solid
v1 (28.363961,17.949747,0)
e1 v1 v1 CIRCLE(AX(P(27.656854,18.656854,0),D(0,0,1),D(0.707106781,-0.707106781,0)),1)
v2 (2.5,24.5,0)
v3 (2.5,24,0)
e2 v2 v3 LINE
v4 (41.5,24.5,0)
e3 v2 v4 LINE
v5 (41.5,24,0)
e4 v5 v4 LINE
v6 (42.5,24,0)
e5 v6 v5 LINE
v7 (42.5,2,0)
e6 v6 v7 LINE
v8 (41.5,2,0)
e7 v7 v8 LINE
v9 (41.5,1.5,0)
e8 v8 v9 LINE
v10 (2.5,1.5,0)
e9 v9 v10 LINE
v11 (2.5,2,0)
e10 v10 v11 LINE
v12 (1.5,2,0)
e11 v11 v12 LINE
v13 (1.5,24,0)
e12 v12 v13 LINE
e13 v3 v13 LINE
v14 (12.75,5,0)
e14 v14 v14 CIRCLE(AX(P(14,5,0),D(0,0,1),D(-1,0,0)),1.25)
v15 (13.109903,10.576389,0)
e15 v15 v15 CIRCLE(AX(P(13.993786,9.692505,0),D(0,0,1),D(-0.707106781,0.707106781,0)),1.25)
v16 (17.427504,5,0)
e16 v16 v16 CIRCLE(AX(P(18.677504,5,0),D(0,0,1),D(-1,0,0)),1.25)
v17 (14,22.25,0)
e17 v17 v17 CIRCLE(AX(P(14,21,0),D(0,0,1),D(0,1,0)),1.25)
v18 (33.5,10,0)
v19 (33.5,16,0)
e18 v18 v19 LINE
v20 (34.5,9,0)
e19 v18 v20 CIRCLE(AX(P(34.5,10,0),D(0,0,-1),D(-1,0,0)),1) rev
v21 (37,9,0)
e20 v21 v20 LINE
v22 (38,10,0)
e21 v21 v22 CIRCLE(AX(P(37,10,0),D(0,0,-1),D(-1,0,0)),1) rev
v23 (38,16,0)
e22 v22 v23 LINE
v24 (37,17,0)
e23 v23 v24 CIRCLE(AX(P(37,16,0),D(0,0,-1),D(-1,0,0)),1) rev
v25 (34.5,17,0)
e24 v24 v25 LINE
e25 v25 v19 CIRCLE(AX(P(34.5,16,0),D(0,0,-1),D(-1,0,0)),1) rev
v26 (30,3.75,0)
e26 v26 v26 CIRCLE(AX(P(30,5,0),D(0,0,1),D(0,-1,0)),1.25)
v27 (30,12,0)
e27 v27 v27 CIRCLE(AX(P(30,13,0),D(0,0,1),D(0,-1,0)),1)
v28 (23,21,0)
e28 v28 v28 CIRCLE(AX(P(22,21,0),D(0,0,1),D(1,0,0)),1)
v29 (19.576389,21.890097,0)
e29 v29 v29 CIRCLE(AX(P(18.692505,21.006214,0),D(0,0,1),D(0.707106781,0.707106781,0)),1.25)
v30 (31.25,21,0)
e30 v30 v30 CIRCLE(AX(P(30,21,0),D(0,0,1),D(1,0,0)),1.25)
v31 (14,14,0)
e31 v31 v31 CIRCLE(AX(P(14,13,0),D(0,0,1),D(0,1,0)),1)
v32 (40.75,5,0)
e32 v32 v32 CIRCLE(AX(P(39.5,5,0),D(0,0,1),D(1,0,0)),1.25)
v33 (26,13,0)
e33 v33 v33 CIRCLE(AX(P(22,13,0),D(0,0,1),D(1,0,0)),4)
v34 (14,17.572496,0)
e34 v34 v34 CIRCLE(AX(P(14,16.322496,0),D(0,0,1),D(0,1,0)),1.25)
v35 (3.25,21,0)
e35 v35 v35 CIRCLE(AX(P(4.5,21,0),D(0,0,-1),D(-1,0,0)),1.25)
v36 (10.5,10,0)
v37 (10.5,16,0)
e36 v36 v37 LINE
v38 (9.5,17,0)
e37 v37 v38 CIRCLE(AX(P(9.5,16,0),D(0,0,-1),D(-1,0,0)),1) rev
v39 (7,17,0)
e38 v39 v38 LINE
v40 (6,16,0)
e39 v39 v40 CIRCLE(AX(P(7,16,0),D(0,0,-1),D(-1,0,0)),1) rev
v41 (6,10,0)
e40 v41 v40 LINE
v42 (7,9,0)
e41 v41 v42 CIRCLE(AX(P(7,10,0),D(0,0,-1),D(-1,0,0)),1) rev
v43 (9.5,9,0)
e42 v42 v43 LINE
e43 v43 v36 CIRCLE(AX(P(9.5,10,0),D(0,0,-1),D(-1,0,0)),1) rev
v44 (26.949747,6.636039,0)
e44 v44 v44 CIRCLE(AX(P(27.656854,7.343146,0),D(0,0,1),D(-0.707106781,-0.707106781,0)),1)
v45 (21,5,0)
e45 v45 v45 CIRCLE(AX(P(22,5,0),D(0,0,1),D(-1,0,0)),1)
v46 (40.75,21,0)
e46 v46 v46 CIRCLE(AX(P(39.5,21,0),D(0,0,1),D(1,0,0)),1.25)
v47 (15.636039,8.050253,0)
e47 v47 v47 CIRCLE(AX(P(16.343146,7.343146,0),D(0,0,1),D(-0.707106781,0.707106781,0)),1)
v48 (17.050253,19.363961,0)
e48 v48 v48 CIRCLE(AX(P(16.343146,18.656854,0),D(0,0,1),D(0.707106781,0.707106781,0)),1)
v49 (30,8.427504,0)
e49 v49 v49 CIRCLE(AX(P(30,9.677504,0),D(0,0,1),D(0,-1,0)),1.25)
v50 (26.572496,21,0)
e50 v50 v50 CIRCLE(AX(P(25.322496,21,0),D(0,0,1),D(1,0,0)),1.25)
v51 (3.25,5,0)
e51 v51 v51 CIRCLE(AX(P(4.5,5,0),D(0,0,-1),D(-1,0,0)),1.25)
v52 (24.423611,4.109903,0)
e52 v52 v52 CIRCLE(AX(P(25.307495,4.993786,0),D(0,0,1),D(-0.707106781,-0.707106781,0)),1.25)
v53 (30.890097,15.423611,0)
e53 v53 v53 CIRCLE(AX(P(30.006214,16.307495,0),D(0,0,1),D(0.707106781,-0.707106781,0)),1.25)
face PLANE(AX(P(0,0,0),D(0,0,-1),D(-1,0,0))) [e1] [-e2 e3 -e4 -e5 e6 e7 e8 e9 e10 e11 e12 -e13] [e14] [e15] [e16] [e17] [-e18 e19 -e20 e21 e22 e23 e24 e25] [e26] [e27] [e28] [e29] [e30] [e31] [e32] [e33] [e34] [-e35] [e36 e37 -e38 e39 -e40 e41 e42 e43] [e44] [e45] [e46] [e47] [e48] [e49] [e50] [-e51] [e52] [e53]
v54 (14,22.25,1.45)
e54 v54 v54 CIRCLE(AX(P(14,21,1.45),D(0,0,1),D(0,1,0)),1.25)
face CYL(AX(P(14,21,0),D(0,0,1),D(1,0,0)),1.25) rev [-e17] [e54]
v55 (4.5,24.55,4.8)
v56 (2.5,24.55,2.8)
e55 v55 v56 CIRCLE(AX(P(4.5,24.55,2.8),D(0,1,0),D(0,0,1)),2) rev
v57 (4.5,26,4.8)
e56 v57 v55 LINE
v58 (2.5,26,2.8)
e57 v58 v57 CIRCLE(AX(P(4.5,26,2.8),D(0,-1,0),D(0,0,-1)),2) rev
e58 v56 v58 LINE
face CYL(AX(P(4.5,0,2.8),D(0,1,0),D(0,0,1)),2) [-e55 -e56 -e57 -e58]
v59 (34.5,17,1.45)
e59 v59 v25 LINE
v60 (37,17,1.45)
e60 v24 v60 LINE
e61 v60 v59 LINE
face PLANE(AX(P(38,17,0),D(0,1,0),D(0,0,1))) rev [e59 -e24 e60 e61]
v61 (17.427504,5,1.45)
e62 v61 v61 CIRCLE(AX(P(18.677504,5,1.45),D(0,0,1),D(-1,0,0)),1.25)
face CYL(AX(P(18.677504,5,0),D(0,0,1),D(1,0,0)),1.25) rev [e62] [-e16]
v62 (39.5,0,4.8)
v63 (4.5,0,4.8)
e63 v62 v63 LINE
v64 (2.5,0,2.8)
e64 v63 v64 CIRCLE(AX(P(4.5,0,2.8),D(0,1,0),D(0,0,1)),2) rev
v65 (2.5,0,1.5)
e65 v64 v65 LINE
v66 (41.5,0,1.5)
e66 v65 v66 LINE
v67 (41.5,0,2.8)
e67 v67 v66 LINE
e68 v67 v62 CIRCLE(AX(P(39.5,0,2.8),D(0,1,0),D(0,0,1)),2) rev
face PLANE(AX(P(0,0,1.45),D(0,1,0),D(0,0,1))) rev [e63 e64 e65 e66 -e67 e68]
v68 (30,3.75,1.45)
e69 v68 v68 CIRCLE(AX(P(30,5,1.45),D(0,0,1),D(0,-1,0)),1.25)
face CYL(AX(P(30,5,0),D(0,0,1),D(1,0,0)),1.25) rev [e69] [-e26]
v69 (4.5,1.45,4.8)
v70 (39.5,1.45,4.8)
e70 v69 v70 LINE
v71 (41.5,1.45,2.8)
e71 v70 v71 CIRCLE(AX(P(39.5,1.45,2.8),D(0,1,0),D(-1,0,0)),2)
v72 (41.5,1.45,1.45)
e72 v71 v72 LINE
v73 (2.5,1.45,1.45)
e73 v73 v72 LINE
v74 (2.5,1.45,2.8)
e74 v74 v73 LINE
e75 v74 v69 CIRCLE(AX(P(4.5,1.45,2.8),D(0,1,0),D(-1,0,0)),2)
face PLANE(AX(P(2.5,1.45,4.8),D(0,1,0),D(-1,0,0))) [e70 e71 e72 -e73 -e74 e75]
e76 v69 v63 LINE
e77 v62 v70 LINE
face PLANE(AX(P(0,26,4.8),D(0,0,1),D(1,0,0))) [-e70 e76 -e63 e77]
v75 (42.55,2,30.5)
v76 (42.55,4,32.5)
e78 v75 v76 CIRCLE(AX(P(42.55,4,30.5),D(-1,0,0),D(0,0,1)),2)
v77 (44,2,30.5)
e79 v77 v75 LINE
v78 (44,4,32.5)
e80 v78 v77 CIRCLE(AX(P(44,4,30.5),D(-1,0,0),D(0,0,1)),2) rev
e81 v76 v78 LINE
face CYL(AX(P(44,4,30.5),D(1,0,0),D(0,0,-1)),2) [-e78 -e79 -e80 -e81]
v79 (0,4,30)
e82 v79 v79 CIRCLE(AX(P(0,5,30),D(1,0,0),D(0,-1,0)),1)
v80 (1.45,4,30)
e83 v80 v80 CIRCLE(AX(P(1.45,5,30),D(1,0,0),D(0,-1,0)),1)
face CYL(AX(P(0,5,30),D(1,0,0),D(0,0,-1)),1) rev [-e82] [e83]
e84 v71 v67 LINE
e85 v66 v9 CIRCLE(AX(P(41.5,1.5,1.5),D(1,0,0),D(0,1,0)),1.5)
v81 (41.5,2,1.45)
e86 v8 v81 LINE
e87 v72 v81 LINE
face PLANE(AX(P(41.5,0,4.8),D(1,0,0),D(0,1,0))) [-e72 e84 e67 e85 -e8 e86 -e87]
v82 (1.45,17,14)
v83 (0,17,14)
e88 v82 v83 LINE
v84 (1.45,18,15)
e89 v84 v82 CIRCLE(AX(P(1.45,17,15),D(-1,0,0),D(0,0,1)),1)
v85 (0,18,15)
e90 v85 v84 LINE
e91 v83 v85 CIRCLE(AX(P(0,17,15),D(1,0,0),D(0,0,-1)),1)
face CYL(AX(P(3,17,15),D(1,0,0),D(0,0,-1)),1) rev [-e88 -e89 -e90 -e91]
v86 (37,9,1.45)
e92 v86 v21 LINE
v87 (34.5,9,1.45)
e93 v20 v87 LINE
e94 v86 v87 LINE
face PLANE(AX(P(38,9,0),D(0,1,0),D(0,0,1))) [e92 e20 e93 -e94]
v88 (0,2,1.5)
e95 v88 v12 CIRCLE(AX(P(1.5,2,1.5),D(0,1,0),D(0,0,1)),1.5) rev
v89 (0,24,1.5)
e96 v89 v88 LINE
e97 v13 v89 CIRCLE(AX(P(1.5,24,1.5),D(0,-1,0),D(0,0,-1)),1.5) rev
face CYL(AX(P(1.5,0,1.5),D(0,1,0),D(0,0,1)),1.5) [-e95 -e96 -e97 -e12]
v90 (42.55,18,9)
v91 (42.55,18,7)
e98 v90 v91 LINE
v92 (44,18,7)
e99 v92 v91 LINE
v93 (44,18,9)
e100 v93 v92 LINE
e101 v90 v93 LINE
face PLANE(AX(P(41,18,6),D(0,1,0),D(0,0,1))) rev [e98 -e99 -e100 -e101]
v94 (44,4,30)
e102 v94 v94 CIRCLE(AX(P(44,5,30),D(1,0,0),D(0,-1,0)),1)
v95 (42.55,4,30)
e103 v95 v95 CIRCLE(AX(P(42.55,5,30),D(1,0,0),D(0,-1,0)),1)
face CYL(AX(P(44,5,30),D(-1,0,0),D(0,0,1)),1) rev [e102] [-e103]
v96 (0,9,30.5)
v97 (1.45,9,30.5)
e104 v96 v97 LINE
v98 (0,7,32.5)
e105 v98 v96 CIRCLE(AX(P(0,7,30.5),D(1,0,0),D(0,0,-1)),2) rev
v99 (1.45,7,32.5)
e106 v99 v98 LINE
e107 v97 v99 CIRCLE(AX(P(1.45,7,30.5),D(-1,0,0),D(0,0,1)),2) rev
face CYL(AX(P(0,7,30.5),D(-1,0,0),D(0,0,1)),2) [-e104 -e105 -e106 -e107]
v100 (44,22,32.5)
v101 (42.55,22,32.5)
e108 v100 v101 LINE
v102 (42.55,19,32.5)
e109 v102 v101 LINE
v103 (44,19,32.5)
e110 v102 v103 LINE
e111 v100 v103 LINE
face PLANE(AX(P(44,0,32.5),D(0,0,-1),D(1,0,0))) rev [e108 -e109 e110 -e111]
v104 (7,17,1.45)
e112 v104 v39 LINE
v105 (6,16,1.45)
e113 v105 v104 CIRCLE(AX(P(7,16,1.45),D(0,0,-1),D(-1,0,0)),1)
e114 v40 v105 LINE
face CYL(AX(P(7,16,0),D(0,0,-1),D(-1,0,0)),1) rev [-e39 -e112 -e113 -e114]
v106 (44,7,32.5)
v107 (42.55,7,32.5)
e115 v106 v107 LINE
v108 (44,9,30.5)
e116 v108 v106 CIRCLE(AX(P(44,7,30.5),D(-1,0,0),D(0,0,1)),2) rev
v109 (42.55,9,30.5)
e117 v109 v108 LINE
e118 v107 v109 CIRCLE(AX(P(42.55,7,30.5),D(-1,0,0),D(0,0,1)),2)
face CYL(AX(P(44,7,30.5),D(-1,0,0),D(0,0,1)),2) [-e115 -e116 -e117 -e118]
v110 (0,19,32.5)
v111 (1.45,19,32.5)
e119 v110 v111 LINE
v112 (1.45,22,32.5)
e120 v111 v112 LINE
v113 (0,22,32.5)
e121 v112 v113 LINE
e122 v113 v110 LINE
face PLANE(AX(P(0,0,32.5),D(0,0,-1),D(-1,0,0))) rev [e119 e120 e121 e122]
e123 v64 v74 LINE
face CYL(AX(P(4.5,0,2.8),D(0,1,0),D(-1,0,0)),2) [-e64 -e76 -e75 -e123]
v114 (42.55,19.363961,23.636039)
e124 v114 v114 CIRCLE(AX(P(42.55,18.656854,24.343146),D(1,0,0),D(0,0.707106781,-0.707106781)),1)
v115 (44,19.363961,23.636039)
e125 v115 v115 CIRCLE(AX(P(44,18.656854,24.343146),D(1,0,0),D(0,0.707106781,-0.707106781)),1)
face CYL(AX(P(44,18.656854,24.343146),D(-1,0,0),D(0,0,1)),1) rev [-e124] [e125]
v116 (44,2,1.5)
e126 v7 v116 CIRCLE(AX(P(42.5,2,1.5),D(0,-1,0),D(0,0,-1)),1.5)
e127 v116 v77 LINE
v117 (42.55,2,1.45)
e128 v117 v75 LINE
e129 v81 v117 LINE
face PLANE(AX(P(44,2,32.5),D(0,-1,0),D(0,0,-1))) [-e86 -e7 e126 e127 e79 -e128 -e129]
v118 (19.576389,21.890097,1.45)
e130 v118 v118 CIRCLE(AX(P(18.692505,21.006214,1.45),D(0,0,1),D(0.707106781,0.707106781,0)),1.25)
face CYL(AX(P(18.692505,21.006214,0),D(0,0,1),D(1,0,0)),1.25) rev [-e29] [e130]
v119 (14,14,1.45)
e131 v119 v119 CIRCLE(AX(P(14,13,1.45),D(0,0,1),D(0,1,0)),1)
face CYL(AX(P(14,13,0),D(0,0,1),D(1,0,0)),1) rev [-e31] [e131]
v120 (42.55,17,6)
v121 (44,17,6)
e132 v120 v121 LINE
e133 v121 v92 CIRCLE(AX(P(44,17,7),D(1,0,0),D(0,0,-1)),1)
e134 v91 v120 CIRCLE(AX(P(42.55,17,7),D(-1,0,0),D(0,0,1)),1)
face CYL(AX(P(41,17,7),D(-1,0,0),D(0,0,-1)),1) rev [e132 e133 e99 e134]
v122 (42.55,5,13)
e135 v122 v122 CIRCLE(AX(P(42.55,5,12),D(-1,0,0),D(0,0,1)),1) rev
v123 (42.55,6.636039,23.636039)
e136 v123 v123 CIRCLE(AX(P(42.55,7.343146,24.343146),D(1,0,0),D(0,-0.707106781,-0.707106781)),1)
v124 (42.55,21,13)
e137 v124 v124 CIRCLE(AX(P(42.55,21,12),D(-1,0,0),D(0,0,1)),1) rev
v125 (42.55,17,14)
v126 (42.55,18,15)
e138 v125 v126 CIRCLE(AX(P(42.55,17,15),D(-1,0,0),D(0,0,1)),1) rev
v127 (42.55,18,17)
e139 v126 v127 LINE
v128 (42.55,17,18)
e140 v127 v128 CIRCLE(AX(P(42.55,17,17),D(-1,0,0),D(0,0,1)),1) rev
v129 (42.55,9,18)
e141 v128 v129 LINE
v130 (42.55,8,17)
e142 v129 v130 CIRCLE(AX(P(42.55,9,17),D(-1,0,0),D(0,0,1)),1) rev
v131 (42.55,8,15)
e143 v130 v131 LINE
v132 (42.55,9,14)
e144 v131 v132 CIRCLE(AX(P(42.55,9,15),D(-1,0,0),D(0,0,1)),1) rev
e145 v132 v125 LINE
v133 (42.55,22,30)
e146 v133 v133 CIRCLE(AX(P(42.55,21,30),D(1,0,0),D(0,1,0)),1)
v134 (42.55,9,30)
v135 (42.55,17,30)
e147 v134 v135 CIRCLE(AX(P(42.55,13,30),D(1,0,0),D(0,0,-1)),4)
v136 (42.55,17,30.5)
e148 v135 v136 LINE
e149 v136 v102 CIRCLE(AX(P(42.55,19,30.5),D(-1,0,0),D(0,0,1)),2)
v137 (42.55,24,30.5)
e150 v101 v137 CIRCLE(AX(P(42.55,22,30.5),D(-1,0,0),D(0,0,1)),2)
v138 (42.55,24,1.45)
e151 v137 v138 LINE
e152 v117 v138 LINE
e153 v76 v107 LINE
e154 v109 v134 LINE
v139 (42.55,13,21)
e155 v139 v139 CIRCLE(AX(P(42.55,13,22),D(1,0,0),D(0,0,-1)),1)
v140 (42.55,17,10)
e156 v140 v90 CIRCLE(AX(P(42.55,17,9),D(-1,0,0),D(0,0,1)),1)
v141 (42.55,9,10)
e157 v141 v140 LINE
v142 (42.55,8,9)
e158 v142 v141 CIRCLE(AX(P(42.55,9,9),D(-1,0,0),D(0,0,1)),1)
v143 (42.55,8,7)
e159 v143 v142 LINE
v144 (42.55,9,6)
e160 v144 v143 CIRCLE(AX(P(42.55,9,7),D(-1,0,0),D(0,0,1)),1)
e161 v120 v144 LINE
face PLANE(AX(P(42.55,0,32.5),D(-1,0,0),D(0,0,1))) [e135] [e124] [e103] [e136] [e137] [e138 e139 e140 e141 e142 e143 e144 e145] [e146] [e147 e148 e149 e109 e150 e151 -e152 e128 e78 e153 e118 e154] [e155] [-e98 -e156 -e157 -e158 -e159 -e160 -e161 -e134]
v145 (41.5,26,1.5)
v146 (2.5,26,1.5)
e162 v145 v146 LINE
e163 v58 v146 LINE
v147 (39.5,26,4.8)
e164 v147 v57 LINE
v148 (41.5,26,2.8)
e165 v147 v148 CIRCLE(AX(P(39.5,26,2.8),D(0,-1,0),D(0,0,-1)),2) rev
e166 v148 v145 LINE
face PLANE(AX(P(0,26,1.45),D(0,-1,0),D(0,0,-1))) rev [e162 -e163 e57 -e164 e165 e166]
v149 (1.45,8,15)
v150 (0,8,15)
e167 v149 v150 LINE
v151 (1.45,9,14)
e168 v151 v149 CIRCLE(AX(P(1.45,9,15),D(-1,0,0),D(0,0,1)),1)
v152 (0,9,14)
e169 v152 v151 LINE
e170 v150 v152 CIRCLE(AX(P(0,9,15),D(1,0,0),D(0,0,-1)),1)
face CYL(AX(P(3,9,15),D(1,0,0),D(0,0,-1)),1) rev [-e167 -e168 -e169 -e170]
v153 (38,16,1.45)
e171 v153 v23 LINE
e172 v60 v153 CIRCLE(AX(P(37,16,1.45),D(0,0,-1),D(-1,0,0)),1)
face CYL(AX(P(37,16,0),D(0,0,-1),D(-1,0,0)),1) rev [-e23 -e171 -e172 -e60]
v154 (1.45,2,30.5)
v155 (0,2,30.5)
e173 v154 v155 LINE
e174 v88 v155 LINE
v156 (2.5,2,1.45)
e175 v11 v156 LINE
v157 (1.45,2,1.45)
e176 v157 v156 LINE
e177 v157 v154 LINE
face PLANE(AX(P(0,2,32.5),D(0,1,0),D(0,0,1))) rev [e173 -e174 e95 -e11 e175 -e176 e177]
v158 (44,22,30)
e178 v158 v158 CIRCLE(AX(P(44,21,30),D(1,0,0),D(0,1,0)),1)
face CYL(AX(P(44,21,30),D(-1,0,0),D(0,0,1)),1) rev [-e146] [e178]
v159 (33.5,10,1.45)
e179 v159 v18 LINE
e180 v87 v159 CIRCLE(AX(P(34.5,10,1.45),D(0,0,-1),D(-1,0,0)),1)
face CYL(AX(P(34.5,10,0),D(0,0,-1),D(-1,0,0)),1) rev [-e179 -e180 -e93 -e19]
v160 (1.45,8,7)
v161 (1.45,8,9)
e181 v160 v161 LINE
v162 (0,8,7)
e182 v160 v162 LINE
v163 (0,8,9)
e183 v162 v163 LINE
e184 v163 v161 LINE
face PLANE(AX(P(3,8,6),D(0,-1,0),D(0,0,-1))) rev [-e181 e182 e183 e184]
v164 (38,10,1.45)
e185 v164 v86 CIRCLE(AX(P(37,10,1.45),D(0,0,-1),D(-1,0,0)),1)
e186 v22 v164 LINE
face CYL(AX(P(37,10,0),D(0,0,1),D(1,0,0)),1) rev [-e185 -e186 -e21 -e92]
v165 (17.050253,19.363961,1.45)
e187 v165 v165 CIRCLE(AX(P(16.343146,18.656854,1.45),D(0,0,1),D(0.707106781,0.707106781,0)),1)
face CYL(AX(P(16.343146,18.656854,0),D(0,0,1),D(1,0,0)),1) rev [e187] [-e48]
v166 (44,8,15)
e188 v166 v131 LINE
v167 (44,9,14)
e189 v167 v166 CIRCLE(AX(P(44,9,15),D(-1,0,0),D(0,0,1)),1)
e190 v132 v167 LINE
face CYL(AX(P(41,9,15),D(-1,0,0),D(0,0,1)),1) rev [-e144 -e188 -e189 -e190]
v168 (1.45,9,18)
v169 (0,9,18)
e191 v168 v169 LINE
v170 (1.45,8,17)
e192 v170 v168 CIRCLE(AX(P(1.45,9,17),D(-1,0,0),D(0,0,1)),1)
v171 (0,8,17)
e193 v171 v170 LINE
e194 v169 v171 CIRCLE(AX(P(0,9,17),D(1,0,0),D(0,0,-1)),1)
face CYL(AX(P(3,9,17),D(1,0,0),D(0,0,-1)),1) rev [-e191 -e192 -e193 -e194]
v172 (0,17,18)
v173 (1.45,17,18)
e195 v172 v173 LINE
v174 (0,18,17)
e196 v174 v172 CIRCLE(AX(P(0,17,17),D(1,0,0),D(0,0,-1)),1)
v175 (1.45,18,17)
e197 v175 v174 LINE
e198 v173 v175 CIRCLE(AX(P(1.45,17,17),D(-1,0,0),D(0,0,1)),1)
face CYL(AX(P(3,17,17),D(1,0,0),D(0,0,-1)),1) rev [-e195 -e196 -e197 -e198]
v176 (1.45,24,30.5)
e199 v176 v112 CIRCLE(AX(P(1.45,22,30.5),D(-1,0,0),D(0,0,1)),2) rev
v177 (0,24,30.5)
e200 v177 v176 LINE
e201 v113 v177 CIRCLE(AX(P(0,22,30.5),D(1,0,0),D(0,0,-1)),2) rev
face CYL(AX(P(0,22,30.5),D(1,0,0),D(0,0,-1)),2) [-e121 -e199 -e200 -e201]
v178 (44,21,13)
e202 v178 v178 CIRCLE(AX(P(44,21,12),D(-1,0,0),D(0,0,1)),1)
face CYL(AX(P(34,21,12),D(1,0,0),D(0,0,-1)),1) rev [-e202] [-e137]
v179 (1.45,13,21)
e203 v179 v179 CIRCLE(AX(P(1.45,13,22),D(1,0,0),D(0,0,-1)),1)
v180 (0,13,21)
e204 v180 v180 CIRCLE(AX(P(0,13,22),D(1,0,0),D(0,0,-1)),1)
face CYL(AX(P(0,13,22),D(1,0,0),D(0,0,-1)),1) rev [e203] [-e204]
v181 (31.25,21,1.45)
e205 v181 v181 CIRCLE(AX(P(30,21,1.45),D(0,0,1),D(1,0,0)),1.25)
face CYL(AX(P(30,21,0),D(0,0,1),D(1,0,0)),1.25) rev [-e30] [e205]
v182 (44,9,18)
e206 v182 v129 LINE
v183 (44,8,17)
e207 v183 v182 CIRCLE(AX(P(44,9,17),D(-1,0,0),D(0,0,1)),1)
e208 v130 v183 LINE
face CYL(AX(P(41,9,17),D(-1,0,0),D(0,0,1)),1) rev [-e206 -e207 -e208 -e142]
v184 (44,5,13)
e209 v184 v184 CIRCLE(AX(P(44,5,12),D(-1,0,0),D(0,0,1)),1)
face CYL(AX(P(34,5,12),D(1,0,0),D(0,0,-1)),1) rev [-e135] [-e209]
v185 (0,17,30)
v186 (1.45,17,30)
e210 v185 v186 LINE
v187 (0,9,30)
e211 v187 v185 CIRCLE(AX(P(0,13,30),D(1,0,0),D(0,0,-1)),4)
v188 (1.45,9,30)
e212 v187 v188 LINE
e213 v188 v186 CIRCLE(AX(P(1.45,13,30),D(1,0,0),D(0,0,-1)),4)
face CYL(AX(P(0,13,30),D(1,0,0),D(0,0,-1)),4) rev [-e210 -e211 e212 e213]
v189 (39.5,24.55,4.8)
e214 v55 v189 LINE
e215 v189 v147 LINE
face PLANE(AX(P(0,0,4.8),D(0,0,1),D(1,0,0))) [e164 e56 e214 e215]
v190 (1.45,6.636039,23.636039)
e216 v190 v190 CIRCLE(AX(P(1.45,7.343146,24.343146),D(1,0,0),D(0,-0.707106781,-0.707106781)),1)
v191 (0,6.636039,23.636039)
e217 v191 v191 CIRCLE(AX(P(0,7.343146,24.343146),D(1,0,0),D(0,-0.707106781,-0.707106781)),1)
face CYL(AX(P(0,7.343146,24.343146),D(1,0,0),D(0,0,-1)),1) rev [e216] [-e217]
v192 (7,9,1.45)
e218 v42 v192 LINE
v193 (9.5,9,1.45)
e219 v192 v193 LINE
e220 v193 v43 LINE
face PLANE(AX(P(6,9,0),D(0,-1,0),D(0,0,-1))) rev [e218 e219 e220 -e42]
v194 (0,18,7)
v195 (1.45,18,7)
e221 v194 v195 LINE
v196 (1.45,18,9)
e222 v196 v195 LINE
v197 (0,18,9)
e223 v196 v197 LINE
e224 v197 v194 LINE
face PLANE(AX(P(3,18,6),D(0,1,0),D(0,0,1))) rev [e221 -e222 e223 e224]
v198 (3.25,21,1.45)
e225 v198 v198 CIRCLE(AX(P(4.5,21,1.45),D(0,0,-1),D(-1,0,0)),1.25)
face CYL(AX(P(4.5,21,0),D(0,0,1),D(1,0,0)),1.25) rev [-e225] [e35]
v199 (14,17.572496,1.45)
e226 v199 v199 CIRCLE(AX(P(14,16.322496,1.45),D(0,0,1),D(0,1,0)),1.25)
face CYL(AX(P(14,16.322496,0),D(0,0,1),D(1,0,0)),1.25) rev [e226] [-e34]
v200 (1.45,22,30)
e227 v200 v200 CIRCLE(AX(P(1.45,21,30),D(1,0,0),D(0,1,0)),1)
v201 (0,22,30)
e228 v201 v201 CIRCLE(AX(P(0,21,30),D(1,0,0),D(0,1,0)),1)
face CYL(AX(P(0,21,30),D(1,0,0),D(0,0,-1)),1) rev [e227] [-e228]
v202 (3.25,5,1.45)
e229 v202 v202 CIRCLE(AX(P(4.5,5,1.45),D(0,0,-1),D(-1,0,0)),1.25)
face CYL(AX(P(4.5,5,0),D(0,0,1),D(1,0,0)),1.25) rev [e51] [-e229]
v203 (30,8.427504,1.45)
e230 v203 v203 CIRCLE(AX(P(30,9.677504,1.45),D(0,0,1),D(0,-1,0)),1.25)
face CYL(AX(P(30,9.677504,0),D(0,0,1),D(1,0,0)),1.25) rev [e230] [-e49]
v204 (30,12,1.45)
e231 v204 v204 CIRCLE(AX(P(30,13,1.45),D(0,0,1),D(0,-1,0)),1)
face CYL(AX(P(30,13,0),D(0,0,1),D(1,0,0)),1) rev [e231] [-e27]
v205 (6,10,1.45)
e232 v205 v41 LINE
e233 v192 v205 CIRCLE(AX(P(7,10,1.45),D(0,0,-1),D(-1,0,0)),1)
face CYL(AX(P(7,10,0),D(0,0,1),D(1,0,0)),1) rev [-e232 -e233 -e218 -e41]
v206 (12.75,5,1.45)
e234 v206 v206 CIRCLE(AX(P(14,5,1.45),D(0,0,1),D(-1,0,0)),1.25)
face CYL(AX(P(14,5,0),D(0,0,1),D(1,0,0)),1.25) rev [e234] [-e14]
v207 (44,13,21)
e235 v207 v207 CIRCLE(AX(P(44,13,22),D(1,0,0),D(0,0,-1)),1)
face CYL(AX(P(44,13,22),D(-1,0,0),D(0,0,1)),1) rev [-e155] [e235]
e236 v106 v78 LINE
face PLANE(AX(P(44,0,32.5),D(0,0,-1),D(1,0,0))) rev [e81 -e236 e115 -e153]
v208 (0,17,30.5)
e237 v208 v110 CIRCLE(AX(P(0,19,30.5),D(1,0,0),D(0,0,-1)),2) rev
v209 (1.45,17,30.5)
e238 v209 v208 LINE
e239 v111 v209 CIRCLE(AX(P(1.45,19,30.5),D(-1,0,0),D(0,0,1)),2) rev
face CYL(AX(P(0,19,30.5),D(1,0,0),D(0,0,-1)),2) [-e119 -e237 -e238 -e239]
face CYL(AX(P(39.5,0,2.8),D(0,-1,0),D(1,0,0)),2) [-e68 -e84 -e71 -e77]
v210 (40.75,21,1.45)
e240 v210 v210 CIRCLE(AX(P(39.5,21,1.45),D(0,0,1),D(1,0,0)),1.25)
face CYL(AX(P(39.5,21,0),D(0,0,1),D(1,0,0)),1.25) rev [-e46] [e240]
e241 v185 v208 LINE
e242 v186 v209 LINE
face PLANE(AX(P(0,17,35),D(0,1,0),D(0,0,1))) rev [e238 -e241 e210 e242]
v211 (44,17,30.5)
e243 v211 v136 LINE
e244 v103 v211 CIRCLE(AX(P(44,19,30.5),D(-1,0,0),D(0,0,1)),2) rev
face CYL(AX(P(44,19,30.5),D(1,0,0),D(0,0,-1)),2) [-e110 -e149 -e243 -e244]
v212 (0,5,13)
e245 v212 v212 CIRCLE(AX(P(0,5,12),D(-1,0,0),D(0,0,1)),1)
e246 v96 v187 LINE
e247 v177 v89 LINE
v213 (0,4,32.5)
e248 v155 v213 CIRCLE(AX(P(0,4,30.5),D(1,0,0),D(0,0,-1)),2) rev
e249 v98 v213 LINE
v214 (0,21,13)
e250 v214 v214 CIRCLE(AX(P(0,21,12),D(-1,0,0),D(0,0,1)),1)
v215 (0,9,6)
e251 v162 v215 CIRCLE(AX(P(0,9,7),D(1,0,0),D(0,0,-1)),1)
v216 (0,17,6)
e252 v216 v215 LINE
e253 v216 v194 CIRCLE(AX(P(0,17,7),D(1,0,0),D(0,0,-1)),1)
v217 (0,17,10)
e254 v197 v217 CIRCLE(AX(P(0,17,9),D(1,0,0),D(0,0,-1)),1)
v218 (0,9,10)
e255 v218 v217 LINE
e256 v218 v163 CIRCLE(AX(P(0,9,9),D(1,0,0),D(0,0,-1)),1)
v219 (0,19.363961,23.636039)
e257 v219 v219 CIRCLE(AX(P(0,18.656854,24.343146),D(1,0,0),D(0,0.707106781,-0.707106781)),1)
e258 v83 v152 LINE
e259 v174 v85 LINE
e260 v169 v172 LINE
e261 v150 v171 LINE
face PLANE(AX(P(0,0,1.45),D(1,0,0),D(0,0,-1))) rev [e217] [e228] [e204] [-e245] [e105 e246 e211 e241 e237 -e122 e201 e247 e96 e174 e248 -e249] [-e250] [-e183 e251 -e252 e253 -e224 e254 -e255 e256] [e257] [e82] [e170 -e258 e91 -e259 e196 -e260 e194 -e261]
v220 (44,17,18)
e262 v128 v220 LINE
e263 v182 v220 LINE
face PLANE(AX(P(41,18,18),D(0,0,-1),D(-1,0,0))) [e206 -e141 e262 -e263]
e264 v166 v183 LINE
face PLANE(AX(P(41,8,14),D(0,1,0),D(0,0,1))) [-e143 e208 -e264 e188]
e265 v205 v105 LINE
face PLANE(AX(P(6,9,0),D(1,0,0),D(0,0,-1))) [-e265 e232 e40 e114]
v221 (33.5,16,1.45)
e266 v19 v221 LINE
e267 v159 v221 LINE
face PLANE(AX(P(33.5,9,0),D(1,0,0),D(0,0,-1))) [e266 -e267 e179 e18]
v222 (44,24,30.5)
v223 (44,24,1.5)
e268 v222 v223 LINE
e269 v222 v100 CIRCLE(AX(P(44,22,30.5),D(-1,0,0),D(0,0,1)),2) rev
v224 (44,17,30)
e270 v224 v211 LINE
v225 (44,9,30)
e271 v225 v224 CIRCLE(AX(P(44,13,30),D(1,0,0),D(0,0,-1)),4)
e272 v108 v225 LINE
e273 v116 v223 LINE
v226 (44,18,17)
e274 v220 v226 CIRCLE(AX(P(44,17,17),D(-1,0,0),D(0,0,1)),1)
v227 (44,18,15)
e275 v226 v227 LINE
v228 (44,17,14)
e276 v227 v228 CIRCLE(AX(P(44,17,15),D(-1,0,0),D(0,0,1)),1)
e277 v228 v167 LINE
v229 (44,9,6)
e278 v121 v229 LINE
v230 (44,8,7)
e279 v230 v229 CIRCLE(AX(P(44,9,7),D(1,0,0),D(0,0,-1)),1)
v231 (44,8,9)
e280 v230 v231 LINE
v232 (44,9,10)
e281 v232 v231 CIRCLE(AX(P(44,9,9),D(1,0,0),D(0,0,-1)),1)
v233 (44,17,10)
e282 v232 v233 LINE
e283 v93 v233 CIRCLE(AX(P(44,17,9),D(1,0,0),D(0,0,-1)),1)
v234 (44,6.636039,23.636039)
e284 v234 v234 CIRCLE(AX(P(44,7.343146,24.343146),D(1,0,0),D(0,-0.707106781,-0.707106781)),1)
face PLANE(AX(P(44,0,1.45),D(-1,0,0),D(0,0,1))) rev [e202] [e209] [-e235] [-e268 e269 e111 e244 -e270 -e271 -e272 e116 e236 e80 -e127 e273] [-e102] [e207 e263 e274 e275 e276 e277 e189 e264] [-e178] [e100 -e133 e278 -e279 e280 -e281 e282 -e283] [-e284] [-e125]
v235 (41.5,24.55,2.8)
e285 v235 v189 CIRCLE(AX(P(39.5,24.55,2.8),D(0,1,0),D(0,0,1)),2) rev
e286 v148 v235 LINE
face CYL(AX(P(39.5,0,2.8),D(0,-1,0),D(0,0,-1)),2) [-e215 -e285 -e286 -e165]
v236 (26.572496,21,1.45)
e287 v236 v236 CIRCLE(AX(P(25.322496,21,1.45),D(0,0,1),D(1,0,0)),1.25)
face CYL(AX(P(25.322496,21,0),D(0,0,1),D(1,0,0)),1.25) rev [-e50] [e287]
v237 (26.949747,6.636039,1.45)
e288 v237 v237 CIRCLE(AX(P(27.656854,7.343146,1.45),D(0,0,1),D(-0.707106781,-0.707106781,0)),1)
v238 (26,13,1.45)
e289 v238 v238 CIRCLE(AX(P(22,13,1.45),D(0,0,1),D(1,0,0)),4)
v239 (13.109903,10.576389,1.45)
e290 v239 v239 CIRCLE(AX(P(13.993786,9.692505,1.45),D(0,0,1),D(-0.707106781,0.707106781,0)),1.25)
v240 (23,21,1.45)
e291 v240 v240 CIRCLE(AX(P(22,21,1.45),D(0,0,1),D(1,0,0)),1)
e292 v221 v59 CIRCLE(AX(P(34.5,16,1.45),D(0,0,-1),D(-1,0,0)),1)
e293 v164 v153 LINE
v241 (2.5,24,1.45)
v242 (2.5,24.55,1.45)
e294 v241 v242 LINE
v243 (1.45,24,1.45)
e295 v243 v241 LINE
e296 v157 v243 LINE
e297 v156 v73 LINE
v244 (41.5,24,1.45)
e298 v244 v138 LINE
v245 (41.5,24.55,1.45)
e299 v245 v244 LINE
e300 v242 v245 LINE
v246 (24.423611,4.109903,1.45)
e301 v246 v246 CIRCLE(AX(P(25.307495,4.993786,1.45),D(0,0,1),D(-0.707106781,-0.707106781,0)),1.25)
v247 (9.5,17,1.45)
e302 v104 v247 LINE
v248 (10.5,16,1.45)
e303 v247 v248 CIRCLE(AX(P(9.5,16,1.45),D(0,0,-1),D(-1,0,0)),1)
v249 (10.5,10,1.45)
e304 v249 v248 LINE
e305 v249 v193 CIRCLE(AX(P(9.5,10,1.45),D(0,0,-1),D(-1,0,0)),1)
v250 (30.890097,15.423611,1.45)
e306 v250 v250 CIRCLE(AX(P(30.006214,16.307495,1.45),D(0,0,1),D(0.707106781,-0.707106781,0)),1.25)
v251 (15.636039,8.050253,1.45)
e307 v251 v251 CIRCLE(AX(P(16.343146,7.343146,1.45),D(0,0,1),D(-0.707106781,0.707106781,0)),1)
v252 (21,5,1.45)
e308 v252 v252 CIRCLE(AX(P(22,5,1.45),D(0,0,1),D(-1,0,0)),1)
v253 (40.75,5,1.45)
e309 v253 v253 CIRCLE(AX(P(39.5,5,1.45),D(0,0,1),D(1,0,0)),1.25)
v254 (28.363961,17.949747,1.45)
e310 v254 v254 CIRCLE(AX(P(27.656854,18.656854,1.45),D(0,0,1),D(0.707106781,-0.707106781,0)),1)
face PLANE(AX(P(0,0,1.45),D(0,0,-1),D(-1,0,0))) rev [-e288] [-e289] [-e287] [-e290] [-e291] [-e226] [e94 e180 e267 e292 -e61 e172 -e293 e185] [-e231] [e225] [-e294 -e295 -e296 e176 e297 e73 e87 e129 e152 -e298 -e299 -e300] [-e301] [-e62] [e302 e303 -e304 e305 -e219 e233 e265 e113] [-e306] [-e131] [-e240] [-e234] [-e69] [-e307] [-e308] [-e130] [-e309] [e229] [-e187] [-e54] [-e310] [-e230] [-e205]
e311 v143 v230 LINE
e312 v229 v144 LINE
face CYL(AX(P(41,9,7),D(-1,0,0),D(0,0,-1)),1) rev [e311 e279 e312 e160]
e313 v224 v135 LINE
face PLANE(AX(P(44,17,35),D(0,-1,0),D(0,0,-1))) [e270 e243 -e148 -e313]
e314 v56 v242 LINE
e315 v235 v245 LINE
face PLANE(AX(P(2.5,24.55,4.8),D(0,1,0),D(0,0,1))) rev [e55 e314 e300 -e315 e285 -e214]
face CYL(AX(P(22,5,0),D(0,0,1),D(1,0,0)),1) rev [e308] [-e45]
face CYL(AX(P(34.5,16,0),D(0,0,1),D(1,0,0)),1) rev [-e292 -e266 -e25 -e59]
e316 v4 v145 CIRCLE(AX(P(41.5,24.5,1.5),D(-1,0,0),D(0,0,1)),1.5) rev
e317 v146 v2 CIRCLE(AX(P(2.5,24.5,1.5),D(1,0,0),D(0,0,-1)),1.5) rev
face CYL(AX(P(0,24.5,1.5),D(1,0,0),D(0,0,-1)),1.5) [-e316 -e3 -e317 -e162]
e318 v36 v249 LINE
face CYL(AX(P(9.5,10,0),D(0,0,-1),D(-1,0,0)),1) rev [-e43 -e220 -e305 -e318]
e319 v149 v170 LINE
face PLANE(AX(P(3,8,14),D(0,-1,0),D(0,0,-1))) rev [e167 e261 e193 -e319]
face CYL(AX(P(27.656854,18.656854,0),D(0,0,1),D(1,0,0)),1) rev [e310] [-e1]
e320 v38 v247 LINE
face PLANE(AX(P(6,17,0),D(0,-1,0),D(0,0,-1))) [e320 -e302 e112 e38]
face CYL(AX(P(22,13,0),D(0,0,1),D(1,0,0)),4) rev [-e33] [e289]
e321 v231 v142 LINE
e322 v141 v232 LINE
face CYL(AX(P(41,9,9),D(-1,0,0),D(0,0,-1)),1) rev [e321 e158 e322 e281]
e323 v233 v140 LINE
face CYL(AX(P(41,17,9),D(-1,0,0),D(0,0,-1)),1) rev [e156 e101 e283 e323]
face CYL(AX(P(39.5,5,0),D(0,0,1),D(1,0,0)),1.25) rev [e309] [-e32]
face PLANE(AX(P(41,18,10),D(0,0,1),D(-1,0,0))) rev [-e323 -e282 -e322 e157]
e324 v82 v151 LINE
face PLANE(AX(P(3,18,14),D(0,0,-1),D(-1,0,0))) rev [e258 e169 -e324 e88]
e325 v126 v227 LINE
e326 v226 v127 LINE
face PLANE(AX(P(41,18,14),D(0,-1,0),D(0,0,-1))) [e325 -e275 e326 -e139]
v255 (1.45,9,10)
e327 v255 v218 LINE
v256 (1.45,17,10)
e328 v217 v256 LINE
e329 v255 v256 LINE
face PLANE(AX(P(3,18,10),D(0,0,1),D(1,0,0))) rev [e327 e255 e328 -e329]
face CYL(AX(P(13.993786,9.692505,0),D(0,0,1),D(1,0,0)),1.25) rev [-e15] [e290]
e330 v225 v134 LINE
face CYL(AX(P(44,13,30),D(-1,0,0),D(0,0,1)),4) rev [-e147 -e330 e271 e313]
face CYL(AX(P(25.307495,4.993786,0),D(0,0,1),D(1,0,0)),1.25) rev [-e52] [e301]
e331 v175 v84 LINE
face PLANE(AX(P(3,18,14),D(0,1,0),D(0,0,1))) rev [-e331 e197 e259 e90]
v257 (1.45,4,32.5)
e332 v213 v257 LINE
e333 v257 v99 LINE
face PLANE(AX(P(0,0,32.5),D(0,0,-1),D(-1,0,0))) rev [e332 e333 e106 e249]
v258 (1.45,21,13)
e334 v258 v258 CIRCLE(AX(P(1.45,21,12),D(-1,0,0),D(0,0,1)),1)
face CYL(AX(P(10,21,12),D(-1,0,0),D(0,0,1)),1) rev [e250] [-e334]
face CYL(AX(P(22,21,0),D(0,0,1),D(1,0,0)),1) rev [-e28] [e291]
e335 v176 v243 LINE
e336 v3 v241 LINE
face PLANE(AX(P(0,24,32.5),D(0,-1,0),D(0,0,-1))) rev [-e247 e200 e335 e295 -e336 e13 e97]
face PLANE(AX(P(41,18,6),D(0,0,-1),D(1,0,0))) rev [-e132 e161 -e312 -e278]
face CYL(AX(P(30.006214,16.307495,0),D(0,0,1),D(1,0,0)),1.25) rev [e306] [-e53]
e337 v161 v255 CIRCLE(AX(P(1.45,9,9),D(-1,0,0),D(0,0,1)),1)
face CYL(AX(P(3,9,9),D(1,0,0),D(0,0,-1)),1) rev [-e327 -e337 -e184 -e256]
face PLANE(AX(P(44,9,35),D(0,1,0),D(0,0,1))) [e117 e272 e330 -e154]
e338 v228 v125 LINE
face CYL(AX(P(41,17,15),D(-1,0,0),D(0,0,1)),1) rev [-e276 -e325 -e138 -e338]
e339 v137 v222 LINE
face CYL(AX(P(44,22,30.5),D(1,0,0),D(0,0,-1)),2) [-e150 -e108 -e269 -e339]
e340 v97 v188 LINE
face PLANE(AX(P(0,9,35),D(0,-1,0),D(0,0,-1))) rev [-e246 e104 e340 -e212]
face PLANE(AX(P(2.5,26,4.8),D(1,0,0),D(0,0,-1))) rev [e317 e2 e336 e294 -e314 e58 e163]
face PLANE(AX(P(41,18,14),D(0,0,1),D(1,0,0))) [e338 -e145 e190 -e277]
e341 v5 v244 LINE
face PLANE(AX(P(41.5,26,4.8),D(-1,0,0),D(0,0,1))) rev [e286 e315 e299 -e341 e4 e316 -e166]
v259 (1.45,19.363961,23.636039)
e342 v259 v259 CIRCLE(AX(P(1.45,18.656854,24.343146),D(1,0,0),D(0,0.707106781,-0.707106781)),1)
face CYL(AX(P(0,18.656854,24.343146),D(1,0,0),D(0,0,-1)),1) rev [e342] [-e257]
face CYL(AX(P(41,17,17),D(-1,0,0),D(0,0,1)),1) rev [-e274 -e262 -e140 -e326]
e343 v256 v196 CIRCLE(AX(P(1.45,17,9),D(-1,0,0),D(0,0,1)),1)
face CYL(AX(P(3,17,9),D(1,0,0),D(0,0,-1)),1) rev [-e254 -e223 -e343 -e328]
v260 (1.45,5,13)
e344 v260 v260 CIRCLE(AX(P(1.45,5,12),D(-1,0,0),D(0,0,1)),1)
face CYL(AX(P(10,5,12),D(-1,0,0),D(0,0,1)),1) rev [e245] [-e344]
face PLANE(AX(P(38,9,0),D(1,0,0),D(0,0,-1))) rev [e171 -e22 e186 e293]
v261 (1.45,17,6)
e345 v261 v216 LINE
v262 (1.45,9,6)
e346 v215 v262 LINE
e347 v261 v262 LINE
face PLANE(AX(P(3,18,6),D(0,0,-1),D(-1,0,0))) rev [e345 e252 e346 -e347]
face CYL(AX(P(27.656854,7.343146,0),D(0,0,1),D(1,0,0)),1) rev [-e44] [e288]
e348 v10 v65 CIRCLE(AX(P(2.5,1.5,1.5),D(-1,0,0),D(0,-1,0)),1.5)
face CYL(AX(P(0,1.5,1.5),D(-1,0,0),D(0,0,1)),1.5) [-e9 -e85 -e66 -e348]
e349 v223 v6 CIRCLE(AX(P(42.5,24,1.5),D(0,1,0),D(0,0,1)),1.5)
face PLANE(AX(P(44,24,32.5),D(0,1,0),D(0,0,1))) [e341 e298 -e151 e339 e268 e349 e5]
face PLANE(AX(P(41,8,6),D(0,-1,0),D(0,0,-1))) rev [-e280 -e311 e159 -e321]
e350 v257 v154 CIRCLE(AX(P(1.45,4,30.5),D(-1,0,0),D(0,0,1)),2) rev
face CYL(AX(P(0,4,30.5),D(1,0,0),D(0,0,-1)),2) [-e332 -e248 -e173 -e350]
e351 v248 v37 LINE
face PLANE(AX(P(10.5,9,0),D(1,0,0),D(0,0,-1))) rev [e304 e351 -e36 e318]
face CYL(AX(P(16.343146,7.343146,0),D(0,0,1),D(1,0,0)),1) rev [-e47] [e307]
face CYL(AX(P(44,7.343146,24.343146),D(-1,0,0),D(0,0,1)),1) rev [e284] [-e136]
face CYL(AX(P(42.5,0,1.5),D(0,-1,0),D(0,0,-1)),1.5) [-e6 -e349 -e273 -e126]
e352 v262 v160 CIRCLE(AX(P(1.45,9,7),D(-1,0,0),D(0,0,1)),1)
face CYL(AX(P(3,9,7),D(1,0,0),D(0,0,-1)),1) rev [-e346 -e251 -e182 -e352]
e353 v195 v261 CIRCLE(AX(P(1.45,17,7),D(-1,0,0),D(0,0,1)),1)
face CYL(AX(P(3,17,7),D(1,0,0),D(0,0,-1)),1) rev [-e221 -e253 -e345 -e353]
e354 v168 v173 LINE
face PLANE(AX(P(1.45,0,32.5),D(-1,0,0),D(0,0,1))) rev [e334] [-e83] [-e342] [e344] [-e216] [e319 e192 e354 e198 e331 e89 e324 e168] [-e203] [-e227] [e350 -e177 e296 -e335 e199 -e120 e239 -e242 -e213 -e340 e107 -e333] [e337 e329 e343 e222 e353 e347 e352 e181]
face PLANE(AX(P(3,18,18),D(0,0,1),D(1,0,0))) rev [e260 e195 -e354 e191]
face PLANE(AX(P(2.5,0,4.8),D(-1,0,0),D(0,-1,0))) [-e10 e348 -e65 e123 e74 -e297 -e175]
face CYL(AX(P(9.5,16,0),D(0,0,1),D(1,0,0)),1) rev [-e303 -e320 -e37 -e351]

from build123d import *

# Parameters (mm, degrees)
SKETCH1_W              = 44
SKETCH1_H              = 26
BOSS_EXTRUDE1_DEPTH    = 1.45
SKETCH3_R              = 4
CUT_EXTRUDE1_DEPTH     = 52.128294515
SKETCH4_R              = 1
CUT_EXTRUDE2_DEPTH     = 52.128294515
CIRPATTERN1_COUNT      = 8
SKETCH7_R              = 1.25
CUT_EXTRUDE3_DEPTH     = 52.128294515
CIRPATTERN2_COUNT      = 8
SKETCH9_R              = 1.25
CUT_EXTRUDE4_DEPTH     = 52.128294515
CIRPATTERN3_COUNT      = 4
SKETCH10_R             = 1.25
CUT_EXTRUDE5_DEPTH     = 52.128294515
SKETCH11_R             = 1.25
CUT_EXTRUDE6_DEPTH     = 52.128294515
SKETCH14_W             = 4.5
SKETCH14_H             = 8
CUT_EXTRUDE7_DEPTH     = 52.128294515
FILLET1_R              = 1
FILLET1_OF_MIRROR2_R   = 1
SKETCH16_W             = 1.45
SKETCH16_H             = 26
BOSS_EXTRUDE4_DEPTH    = 31.05
SKETCH21_W             = 5
SKETCH21_H             = 8
CUT_EXTRUDE10_DEPTH    = 60.521025697
SKETCH22_R             = 4
CUT_EXTRUDE11_DEPTH    = 60.521025697
SKETCH23_R             = 1
CUT_EXTRUDE12_DEPTH    = 60.521025697
CIRPATTERN5_COUNT      = 8
SKETCH24_W             = 31.05
SKETCH24_H             = 2
CUT_EXTRUDE13_DEPTH    = 60.521025697
SKETCH26_W             = 31.05
SKETCH26_H             = 2
CUT_EXTRUDE14_DEPTH    = 60.521025697
FILLET3_R              = 2
SKETCH28_R             = 1
CUT_EXTRUDE16_DEPTH    = 10
SKETCH30_R             = 1
CUT_EXTRUDE17_DEPTH    = 10
SKETCH31_W             = 4
SKETCH31_H             = 10
CUT_EXTRUDE18_DEPTH    = 3
FILLET4_R              = 1
LPATTERN1_COUNT        = 2
LPATTERN1_PITCH        = 8
FILLET4_OF_LPATTERN1_R = 1
MIRROR3_START          = 42.55
MIRROR3_OUTLINE_R      = 1
MIRROR3_DEPTH          = 1.45
SKETCH34_W             = 39
SKETCH34_H             = 1.45
BOSS_EXTRUDE8_DEPTH    = 3.35
SKETCH37_W             = 2.5
SKETCH37_H             = 2
CUT_EXTRUDE20_DEPTH    = 3.35
SKETCH35_W             = 2.5
SKETCH35_H             = 2
CUT_EXTRUDE21_DEPTH    = 3.35
FILLET5_R              = 1.5
FILLET6_R              = 2
FILLET7_R              = 1.5
FILLET8_R              = 1.5
FILLET9_R              = 2


# Read off the part's stored shape, not the designer's step: Mirror3
with BuildPart() as part:
    # Sketch1 → Boss-Extrude1 (new body)
    with BuildSketch(Plane.XY):
        with Locations((22, 13)):
            Rectangle(SKETCH1_W, SKETCH1_H)
    extrude(amount=BOSS_EXTRUDE1_DEPTH)

    # Sketch3 → Cut-Extrude1 (cut, through all)
    with BuildSketch(Plane.XY.offset(1.45)):
        with Locations((22, 13)):
            Circle(SKETCH3_R)
    extrude(amount=-CUT_EXTRUDE1_DEPTH, mode=Mode.SUBTRACT)

    # Sketch4 → Cut-Extrude2 (cut, through all)
    with BuildSketch(Plane.XY.offset(1.45)):
        with Locations((22, 21)):
            Circle(SKETCH4_R)
    cut_extrude2 = extrude(amount=-CUT_EXTRUDE2_DEPTH, mode=Mode.SUBTRACT)

    # CirPattern1: Cut-Extrude2 ×8 about axis
    cirpattern1_axis = Axis((22, 13, 0), (0, 0, 1))
    for i in range(1, CIRPATTERN1_COUNT):
        add(cut_extrude2.rotate(cirpattern1_axis, i * 360 / CIRPATTERN1_COUNT), mode=Mode.SUBTRACT)

    # Sketch7 → Cut-Extrude3 (cut, through all)
    with BuildSketch(Plane.XY.offset(1.45)):
        with Locations((25.322496408, 21)):
            Circle(SKETCH7_R)
    cut_extrude3 = extrude(amount=-CUT_EXTRUDE3_DEPTH, mode=Mode.SUBTRACT)

    # CirPattern2: Cut-Extrude3 ×8 about axis
    cirpattern2_axis = Axis((22, 13, 0), (0, 0, 1))
    for i in range(1, CIRPATTERN2_COUNT):
        add(cut_extrude3.rotate(cirpattern2_axis, i * 360 / CIRPATTERN2_COUNT), mode=Mode.SUBTRACT)

    # Sketch9 → Cut-Extrude4 (cut, through all)
    with BuildSketch(Plane.XY.offset(1.45)):
        with Locations((30, 21)):
            Circle(SKETCH9_R)
    cut_extrude4 = extrude(amount=-CUT_EXTRUDE4_DEPTH, mode=Mode.SUBTRACT)

    # CirPattern3: Cut-Extrude4 ×4 about axis
    cirpattern3_axis = Axis((22, 13, 0), (0, 0, 1))
    for i in range(1, CIRPATTERN3_COUNT):
        add(cut_extrude4.rotate(cirpattern3_axis, i * 360 / CIRPATTERN3_COUNT), mode=Mode.SUBTRACT)

    # Sketch10 → Cut-Extrude5 (cut, through all)
    with BuildSketch(Plane.XY.offset(1.45)):
        with Locations((39.5, 21)):
            Circle(SKETCH10_R)
    cut_extrude5 = extrude(amount=-CUT_EXTRUDE5_DEPTH, mode=Mode.SUBTRACT)

    # Sketch11 → Cut-Extrude6 (cut, through all)
    with BuildSketch(Plane.XY.offset(1.45)):
        with Locations((39.5, 5)):
            Circle(SKETCH11_R)
    cut_extrude6 = extrude(amount=-CUT_EXTRUDE6_DEPTH, mode=Mode.SUBTRACT)

    # Mirror1: Cut-Extrude5, Cut-Extrude6 across plane
    add(cut_extrude5.mirror(Plane(origin=(22, 0, 0), x_dir=(0, 0, 1), z_dir=(1, 0, 0))), mode=Mode.SUBTRACT)
    add(cut_extrude6.mirror(Plane(origin=(22, 0, 0), x_dir=(0, 0, 1), z_dir=(1, 0, 0))), mode=Mode.SUBTRACT)

    # Sketch14 → Cut-Extrude7 (cut, through all)
    with BuildSketch(Plane.XY.offset(1.45)):
        with Locations((8.25, 13)):
            Rectangle(SKETCH14_W, SKETCH14_H)
    cut_extrude7 = extrude(amount=-CUT_EXTRUDE7_DEPTH, mode=Mode.SUBTRACT)

    # Fillet1
    fillet1_edges = [part.edges().sort_by_distance(p)[0] for p in [
        (10.5, 9, 0.725),
        (6, 9, 0.725),
        (6, 17, 0.725),
        (10.5, 17, 0.725),
    ]]
    fillet(fillet1_edges, radius=FILLET1_R)

    # Mirror2: Cut-Extrude7 across plane
    add(cut_extrude7.mirror(Plane(origin=(22, 0, 0), x_dir=(0, 0, 1), z_dir=(1, 0, 0))), mode=Mode.SUBTRACT)

    # Fillet1 of Mirror2
    fillet1_of_mirror2_edges = [part.edges().sort_by_distance(p)[0] for p in [
        (33.5, 9, 0.725),
        (38, 9, 0.725),
        (38, 17, 0.725),
        (33.5, 17, 0.725),
    ]]
    fillet(fillet1_of_mirror2_edges, radius=FILLET1_OF_MIRROR2_R)

    # Sketch16 → Boss-Extrude4 (add)
    with BuildSketch(Plane.XY.offset(1.45)):
        with Locations((0.725, 13)):
            Rectangle(SKETCH16_W, SKETCH16_H)
    extrude(amount=BOSS_EXTRUDE4_DEPTH)

    # Sketch21 → Cut-Extrude10 (cut, through all)
    with BuildSketch(Plane(origin=(1.45, 0, 0), x_dir=(0, 0, -1), z_dir=(1, 0, 0))):
        with Locations((-32.5, 13)):
            Rectangle(SKETCH21_W, SKETCH21_H)
    extrude(amount=-CUT_EXTRUDE10_DEPTH, mode=Mode.SUBTRACT)

    # Sketch22 → Cut-Extrude11 (cut, through all)
    with BuildSketch(Plane(origin=(1.45, 0, 0), x_dir=(0, 0, -1), z_dir=(1, 0, 0))):
        with Locations((-30, 13)):
            Circle(SKETCH22_R)
    extrude(amount=-CUT_EXTRUDE11_DEPTH, mode=Mode.SUBTRACT)

    # Sketch23 → Cut-Extrude12 (cut, through all)
    with BuildSketch(Plane(origin=(1.45, 0, 0), x_dir=(0, 0, -1), z_dir=(1, 0, 0))):
        with Locations((-22, 13)):
            Circle(SKETCH23_R)
    cut_extrude12 = extrude(amount=-CUT_EXTRUDE12_DEPTH, mode=Mode.SUBTRACT)

    # CirPattern5: Cut-Extrude12 ×8 about axis, 2 skipped
    cirpattern5_axis = Axis((0, 13, 30), (1, 0, 0))
    add([cut_extrude12.rotate(cirpattern5_axis, i * 360 / CIRPATTERN5_COUNT) for i in range(1, CIRPATTERN5_COUNT) if i not in (4, 5)], mode=Mode.SUBTRACT)

    # Sketch24 → Cut-Extrude13 (cut, through all)
    with BuildSketch(Plane(origin=(1.45, 0, 0), x_dir=(0, 0, -1), z_dir=(1, 0, 0))):
        with Locations((-16.975, 25)):
            Rectangle(SKETCH24_W, SKETCH24_H)
    extrude(amount=-CUT_EXTRUDE13_DEPTH, mode=Mode.SUBTRACT)

    # Sketch26 → Cut-Extrude14 (cut, through all)
    with BuildSketch(Plane(origin=(1.45, 0, 0), x_dir=(0, 0, -1), z_dir=(1, 0, 0))):
        with Locations((-16.975, 1)):
            Rectangle(SKETCH26_W, SKETCH26_H)
    extrude(amount=-CUT_EXTRUDE14_DEPTH, mode=Mode.SUBTRACT)

    # Fillet3
    fillet3_edges = [part.edges().sort_by_distance(p)[0] for p in [
        (0.725, 17, 32.5),
        (0.725, 9, 32.5),
        (0.725, 24, 32.5),
        (0.725, 2, 32.5),
    ]]
    fillet(fillet3_edges, radius=FILLET3_R)

    # Sketch28 → Cut-Extrude16 (cut)
    with BuildSketch(Plane.ZY):
        with Locations((12, 21)):
            Circle(SKETCH28_R)
    extrude(amount=-CUT_EXTRUDE16_DEPTH, mode=Mode.SUBTRACT)

    # Sketch30 → Cut-Extrude17 (cut)
    with BuildSketch(Plane.ZY):
        with Locations((12, 5)):
            Circle(SKETCH30_R)
    extrude(amount=-CUT_EXTRUDE17_DEPTH, mode=Mode.SUBTRACT)

    # Sketch31 → Cut-Extrude18 (cut)
    with BuildSketch(Plane.ZY):
        with Locations((16, 13)):
            Rectangle(SKETCH31_W, SKETCH31_H)
    cut_extrude18 = extrude(amount=-CUT_EXTRUDE18_DEPTH, mode=Mode.SUBTRACT)

    # Fillet4
    fillet4_edges = [part.edges().sort_by_distance(p)[0] for p in [
        (0.725, 8, 14),
        (0.725, 18, 14),
        (0.725, 18, 18),
        (0.725, 8, 18),
    ]]
    fillet(fillet4_edges, radius=FILLET4_R)

    # LPattern1: Cut-Extrude18 ×2
    with Locations(*[(0, 0, -i * LPATTERN1_PITCH) for i in range(1, LPATTERN1_COUNT)]):
        add(cut_extrude18, mode=Mode.SUBTRACT)

    # Fillet4 of LPattern1
    fillet4_of_lpattern1_edges = [part.edges().sort_by_distance(p)[0] for p in [
        (0.725, 8, 6),
        (0.725, 18, 6),
        (0.725, 18, 10),
        (0.725, 8, 10),
    ]]
    fillet(fillet4_of_lpattern1_edges, radius=FILLET4_OF_LPATTERN1_R)

    # Mirror3 outline → Mirror3 (add)
    with BuildSketch(Plane.YZ.offset(MIRROR3_START)):
        with BuildLine():
            Line((7, 32.5), (4, 32.5))
            ThreePointArc((4, 32.5), (2.585786438, 31.914213562), (2, 30.5))
            Line((2, 30.5), (2, 1.45))
            Line((2, 1.45), (24, 1.45))
            Line((24, 1.45), (24, 30.5))
            ThreePointArc((24, 30.5), (23.414213562, 31.914213562), (22, 32.5))
            Line((22, 32.5), (19, 32.5))
            ThreePointArc((19, 32.5), (17.585786438, 31.914213562), (17, 30.5))
            Line((17, 30.5), (17, 30))
            ThreePointArc((17, 30), (13, 26), (9, 30))
            Line((9, 30), (9, 30.5))
            ThreePointArc((9, 30.5), (8.414213562, 31.914213562), (7, 32.5))
        make_face()
        with Locations((5, 12)):
            Circle(MIRROR3_OUTLINE_R, mode=Mode.SUBTRACT)
        with BuildLine():
            Line((18, 9), (18, 7))
            ThreePointArc((18, 7), (17.707106781, 6.292893219), (17, 6))
            Line((17, 6), (9, 6))
            ThreePointArc((9, 6), (8.292893219, 6.292893219), (8, 7))
            Line((8, 7), (8, 9))
            ThreePointArc((8, 9), (8.292893219, 9.707106781), (9, 10))
            Line((9, 10), (17, 10))
            ThreePointArc((17, 10), (17.707106781, 9.707106781), (18, 9))
        make_face(mode=Mode.SUBTRACT)
        with BuildLine():
            ThreePointArc((18, 15), (17.707106781, 14.292893219), (17, 14))
            Line((17, 14), (9, 14))
            ThreePointArc((9, 14), (8.292893219, 14.292893219), (8, 15))
            Line((8, 15), (8, 17))
            ThreePointArc((8, 17), (8.292893219, 17.707106781), (9, 18))
            Line((9, 18), (17, 18))
            ThreePointArc((17, 18), (17.707106781, 17.707106781), (18, 17))
            Line((18, 17), (18, 15))
        make_face(mode=Mode.SUBTRACT)
        with Locations((21, 12)):
            Circle(MIRROR3_OUTLINE_R, mode=Mode.SUBTRACT)
        with Locations((7.343145751, 24.343145751)):
            Circle(MIRROR3_OUTLINE_R, mode=Mode.SUBTRACT)
        with Locations((5, 30)):
            Circle(MIRROR3_OUTLINE_R, mode=Mode.SUBTRACT)
        with Locations((13, 22)):
            Circle(MIRROR3_OUTLINE_R, mode=Mode.SUBTRACT)
        with Locations((18.656854249, 24.343145751)):
            Circle(MIRROR3_OUTLINE_R, mode=Mode.SUBTRACT)
        with Locations((21, 30)):
            Circle(MIRROR3_OUTLINE_R, mode=Mode.SUBTRACT)
    extrude(amount=MIRROR3_DEPTH)

    # Sketch34 → Boss-Extrude8 (add)
    with BuildSketch(Plane.XY.offset(1.45)):
        with Locations((22, 25.275)):
            Rectangle(SKETCH34_W, SKETCH34_H)
    boss_extrude8 = extrude(amount=BOSS_EXTRUDE8_DEPTH)

    # Sketch37 → Cut-Extrude20 (cut)
    with BuildSketch(Plane.XY.offset(1.45)):
        with Locations((42.75, 25)):
            Rectangle(SKETCH37_W, SKETCH37_H)
    cut_extrude20 = extrude(amount=-CUT_EXTRUDE20_DEPTH, mode=Mode.SUBTRACT)

    # Sketch35 → Cut-Extrude21 (cut)
    with BuildSketch(Plane.XY.offset(1.45)):
        with Locations((1.25, 25)):
            Rectangle(SKETCH35_W, SKETCH35_H)
    cut_extrude21 = extrude(amount=-CUT_EXTRUDE21_DEPTH, mode=Mode.SUBTRACT)

    # Fillet5
    fillet5_edges = [part.edges().sort_by_distance(p)[0] for p in [
        (22, 26, 0),
    ]]
    fillet(fillet5_edges, radius=FILLET5_R)

    # Fillet6
    fillet6_edges = [part.edges().sort_by_distance(p)[0] for p in [
        (2.5, 25.275, 4.8),
        (41.5, 25.275, 4.8),
    ]]
    fillet(fillet6_edges, radius=FILLET6_R)

    # Fillet7
    fillet7_edges = [part.edges().sort_by_distance(p)[0] for p in [
        (44, 12, 0),
        (0, 12, 0),
    ]]
    fillet(fillet7_edges, radius=FILLET7_R)

    # Mirror5: Boss-Extrude8, Cut-Extrude20, Cut-Extrude21 across plane
    add(boss_extrude8.mirror(Plane.ZX.offset(13)))
    add(cut_extrude20.mirror(Plane.ZX.offset(13)), mode=Mode.SUBTRACT)
    add(cut_extrude21.mirror(Plane.ZX.offset(13)), mode=Mode.SUBTRACT)

    # Fillet8
    fillet8_edges = [part.edges().sort_by_distance(p)[0] for p in [
        (22, 0, 0),
    ]]
    fillet(fillet8_edges, radius=FILLET8_R)

    # Fillet9
    fillet9_edges = [part.edges().sort_by_distance(p)[0] for p in [
        (2.5, 0.725, 4.8),
        (41.5, 0.725, 4.8),
    ]]
    fillet(fillet9_edges, radius=FILLET9_R)


solid = part.part
